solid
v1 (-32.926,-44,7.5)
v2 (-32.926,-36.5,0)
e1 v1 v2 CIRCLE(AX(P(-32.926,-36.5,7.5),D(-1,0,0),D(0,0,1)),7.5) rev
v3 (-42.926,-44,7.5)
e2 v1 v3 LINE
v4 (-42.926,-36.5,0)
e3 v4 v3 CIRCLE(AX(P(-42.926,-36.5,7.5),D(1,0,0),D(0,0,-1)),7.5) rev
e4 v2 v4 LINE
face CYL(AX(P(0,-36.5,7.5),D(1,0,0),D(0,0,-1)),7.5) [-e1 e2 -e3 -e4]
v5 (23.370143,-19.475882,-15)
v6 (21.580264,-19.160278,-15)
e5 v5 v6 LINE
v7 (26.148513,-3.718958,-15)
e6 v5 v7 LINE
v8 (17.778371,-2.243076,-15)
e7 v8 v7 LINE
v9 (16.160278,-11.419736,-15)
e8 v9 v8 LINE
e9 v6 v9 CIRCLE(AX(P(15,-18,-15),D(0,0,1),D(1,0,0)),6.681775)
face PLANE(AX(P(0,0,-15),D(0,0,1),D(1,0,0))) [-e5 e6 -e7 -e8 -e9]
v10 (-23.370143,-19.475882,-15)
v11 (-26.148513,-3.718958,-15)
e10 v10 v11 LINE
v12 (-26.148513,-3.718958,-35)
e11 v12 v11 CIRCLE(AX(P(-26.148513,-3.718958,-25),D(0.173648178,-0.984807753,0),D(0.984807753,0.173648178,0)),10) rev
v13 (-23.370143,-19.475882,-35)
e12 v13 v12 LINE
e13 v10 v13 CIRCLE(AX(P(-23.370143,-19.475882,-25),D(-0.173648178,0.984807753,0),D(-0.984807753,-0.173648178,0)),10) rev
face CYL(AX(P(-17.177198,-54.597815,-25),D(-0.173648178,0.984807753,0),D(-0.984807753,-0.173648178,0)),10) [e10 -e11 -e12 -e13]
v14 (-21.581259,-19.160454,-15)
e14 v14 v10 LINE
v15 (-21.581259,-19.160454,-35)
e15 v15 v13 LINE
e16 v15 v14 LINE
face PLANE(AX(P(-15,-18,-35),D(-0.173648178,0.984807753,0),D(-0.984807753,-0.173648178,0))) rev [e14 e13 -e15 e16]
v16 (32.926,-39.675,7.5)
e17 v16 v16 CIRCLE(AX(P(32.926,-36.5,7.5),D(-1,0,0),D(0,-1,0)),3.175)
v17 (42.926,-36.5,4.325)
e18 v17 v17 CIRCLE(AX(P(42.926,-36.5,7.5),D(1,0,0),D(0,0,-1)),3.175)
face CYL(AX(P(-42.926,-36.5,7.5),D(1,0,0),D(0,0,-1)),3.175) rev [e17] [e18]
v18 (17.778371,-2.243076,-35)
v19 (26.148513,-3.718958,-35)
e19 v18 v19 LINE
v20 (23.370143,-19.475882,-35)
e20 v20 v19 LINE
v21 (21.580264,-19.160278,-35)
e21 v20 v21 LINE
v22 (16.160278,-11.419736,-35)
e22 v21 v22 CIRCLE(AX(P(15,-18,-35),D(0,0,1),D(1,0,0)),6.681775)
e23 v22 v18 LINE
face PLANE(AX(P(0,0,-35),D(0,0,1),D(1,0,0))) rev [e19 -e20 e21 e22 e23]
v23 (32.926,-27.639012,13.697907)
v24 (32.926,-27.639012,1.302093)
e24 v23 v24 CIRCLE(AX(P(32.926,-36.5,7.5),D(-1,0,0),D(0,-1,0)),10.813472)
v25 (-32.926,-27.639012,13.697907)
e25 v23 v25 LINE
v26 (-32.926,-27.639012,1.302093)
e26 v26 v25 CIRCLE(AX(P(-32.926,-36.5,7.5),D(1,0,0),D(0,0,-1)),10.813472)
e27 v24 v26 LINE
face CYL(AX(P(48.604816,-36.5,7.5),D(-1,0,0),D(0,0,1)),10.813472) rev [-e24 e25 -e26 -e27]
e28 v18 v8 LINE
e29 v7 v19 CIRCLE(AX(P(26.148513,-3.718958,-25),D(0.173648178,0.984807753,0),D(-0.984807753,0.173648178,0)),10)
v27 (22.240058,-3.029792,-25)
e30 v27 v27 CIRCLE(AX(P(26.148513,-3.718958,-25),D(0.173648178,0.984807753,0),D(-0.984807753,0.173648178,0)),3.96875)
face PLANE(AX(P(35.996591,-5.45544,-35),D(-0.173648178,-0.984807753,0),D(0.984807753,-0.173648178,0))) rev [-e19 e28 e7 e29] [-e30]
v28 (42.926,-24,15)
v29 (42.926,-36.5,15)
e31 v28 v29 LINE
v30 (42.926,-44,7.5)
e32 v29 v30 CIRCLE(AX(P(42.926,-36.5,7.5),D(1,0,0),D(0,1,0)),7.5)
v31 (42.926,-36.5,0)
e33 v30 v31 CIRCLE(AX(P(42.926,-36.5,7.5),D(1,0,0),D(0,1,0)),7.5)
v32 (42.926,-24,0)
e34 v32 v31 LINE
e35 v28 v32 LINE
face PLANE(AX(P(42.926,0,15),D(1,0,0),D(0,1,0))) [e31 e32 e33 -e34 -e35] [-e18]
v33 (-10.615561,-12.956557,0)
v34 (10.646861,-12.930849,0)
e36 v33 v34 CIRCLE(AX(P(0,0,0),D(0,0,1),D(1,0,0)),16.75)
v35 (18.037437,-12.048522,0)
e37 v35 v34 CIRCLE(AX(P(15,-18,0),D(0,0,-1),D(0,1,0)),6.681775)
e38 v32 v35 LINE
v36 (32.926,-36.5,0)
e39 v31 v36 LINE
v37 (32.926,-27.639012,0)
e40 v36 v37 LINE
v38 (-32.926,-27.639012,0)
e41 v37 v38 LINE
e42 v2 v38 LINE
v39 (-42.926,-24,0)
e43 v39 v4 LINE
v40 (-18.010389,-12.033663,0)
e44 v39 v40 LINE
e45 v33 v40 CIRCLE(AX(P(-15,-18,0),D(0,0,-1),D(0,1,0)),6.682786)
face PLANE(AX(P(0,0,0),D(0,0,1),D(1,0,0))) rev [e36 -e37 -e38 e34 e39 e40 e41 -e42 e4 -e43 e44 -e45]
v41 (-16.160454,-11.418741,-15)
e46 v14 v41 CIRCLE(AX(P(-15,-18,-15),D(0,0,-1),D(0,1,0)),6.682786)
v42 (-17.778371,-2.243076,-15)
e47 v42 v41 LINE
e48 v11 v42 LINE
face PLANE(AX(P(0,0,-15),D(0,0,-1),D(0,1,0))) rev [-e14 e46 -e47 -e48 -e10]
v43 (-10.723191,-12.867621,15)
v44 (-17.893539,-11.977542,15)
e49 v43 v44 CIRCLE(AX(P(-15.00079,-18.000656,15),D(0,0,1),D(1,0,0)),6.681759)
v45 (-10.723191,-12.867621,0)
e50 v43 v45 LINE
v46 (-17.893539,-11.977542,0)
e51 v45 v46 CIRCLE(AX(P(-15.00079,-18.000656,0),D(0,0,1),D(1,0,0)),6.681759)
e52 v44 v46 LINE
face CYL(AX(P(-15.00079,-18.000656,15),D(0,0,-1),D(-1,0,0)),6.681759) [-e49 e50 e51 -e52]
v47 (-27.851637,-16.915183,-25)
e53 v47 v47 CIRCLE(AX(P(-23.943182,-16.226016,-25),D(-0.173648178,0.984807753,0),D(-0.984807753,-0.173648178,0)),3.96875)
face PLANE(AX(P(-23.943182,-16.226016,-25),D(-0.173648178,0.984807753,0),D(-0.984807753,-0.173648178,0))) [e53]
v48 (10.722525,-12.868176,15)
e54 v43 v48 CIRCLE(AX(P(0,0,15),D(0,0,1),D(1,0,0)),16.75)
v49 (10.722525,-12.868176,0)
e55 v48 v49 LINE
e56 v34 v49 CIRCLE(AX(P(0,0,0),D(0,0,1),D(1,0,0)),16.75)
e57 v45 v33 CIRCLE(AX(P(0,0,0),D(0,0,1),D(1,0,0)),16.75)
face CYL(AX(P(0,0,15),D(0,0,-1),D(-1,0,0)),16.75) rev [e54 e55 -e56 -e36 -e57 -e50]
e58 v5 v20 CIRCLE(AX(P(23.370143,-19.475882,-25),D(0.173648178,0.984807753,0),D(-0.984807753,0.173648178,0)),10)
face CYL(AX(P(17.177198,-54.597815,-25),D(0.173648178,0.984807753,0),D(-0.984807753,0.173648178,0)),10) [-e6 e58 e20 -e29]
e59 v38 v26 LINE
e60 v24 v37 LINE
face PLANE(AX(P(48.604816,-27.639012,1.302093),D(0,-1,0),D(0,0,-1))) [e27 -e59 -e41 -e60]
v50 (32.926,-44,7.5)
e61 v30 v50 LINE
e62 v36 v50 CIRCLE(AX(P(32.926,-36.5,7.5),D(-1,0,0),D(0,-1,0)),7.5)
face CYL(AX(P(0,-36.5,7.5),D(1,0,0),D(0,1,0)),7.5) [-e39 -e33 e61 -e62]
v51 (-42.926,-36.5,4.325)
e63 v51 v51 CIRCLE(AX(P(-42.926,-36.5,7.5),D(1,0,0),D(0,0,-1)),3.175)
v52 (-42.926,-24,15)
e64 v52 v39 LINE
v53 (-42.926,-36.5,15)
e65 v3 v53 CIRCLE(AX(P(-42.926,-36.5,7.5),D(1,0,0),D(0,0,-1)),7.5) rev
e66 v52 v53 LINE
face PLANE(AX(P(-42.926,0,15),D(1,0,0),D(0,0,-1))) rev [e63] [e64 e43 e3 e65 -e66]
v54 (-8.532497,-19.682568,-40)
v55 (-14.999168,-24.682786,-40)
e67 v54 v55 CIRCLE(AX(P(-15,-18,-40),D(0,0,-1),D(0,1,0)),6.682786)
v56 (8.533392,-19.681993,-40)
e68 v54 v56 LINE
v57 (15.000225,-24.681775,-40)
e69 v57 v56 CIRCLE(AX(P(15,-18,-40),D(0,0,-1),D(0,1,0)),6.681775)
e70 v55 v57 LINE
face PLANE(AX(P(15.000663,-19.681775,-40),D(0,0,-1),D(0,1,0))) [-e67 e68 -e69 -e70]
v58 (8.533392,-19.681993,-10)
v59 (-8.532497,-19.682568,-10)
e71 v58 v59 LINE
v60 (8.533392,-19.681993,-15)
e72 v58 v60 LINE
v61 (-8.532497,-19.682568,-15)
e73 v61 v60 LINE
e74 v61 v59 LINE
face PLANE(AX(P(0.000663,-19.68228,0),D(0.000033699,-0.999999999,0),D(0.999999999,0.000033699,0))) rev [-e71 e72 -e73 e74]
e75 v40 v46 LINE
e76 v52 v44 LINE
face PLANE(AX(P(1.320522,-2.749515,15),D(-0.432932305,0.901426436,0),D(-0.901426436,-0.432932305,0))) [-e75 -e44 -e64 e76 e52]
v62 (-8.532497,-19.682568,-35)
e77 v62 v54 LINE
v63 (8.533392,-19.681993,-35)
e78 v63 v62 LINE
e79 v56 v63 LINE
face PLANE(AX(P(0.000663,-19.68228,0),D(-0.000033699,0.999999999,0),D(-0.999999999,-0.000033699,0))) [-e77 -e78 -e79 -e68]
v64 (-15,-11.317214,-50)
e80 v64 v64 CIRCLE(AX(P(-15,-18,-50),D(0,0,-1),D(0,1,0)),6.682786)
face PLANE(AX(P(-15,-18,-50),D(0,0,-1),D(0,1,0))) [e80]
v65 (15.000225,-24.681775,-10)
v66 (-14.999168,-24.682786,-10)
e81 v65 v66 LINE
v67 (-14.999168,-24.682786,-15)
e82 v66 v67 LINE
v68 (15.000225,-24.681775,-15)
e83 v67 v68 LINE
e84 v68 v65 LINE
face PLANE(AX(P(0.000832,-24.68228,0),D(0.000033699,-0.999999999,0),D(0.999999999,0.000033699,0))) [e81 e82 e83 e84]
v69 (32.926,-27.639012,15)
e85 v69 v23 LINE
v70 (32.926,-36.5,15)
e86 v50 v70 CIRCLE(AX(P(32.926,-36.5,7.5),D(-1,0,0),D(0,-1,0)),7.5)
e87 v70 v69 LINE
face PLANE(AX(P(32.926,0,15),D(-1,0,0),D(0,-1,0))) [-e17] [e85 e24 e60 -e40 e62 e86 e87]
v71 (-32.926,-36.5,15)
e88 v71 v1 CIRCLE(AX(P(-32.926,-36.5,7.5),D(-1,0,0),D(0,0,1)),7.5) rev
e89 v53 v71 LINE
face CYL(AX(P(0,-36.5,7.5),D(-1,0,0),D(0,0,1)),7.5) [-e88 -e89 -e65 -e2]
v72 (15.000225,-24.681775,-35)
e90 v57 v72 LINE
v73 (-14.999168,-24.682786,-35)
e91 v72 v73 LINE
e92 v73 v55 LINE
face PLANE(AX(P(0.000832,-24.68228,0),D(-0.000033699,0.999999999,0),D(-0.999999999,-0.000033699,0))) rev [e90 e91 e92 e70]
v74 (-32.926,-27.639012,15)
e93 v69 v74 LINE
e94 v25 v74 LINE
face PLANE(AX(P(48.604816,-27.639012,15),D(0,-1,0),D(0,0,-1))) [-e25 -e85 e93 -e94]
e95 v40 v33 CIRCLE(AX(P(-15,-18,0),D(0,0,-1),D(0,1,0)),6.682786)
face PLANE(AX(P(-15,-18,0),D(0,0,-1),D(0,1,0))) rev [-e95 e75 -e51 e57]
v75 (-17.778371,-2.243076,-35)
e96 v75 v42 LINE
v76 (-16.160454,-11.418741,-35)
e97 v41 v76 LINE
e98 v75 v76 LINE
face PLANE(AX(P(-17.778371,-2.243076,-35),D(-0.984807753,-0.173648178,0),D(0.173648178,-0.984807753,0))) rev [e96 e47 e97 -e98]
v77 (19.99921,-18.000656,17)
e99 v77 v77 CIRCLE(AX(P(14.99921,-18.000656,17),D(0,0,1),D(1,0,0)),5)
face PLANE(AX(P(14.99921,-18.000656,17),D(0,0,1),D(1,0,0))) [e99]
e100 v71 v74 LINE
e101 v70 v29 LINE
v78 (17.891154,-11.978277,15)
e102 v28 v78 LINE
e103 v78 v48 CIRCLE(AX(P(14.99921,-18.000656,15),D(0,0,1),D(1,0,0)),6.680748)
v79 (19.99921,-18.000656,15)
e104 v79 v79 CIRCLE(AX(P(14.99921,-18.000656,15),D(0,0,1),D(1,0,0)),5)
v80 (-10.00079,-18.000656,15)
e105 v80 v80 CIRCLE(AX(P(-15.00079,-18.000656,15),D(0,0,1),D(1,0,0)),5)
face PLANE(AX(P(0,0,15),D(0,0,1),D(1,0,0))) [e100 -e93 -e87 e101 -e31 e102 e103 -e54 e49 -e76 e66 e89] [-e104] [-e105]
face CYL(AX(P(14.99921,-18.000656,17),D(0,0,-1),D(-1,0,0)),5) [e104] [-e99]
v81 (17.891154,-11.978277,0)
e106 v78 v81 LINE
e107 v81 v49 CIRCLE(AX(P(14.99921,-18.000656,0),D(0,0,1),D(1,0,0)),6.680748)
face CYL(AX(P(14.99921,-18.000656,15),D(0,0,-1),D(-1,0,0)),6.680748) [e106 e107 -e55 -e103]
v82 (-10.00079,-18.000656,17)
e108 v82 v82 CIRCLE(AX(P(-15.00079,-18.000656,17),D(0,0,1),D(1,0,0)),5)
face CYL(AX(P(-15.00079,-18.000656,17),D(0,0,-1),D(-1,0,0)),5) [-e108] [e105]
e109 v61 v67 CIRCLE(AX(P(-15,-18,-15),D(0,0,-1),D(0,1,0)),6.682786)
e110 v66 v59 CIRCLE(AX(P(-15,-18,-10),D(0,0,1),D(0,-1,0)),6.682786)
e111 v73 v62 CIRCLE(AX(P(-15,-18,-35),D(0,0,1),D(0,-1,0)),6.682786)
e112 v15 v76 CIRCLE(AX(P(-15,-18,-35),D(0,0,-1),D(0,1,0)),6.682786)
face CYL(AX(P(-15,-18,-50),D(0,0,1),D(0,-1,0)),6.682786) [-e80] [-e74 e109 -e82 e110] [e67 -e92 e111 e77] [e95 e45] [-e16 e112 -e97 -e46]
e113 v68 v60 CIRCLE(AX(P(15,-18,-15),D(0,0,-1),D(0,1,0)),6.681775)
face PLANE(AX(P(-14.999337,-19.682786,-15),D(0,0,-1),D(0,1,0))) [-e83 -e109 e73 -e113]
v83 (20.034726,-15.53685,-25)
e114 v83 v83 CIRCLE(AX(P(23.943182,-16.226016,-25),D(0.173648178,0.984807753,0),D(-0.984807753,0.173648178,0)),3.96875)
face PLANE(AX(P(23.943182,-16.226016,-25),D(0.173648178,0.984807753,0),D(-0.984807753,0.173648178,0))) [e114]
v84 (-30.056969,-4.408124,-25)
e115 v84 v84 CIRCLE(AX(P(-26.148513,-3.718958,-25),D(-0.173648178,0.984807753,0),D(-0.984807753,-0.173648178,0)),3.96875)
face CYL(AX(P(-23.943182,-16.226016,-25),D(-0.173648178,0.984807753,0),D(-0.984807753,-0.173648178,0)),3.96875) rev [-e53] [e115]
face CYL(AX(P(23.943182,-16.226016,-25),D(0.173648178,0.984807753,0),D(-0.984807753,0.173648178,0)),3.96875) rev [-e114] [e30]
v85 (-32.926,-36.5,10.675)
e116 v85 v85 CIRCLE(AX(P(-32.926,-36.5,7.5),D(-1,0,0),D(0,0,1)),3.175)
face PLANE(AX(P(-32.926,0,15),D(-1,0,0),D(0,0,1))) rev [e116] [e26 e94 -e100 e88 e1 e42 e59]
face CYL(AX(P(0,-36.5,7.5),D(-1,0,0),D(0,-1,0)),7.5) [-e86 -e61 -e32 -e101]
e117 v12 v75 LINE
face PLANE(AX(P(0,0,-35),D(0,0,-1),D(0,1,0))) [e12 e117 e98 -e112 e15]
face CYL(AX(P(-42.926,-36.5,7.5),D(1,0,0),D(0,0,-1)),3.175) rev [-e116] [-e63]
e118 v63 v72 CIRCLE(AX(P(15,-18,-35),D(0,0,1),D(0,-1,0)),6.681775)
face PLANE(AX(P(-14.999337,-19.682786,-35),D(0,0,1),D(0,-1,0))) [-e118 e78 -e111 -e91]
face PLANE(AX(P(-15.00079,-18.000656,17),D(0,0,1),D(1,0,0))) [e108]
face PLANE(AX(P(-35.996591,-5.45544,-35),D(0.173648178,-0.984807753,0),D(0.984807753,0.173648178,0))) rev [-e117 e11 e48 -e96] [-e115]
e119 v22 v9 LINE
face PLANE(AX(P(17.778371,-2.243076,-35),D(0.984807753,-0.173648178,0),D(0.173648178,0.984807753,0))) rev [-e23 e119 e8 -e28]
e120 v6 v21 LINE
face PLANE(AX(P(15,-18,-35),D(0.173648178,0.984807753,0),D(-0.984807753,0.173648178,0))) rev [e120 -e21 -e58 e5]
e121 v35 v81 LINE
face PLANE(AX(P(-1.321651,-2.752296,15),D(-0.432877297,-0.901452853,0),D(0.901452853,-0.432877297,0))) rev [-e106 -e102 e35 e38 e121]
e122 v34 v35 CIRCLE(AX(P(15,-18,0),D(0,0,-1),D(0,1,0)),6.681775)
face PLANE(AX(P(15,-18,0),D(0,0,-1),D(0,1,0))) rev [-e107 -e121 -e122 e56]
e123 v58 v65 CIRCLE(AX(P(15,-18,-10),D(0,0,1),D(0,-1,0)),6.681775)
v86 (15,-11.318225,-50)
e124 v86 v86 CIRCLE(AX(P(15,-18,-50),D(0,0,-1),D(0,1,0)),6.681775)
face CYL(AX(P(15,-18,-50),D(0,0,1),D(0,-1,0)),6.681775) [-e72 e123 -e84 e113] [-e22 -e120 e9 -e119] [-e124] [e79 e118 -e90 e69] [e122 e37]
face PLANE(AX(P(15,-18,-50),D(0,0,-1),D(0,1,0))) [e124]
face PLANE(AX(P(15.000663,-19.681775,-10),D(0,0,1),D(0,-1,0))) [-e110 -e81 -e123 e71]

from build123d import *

# Parameters (mm, degrees)
BOSS_EXTRUDE1_DEPTH  = 15
SKETCH2_R            = 5
BOSS_EXTRUDE2_DEPTH  = 2
FILLET1_R            = 7.5
SKETCH3_R            = 3.175
CUT_EXTRUDE1_DEPTH   = 98.956959446
SKETCH6_R            = 6.681774697
SKETCH6_R_2          = 6.68278568
BOSS_EXTRUDE12_DEPTH = 50
SKETCH7_W            = 30
SKETCH7_H            = 5
BOSS_EXTRUDE13_DEPTH = 5
BOSS_EXTRUDE14_DEPTH = 20
CUT_EXTRUDE2_DEPTH   = 80.803575914
CUT_EXTRUDE3_DEPTH   = 80.803575914
SKETCH14_R           = 3.96875
CUT_EXTRUDE5_DEPTH   = 12.7
SKETCH15_R           = 3.96875
CUT_EXTRUDE6_DEPTH   = 12.7
CUT_EXTRUDE7_DEPTH   = 65.852


with BuildPart() as part:
    # Sketch1 → Boss-Extrude1 (new body)
    with BuildSketch(Plane.XY):
        with BuildLine():
            Line((-42.926, -44), (-32.926, -44))
            Line((-32.926, -44), (-32.926, -28.710188268))
            Line((-32.926, -28.710188268), (32.926, -28.710188268))
            Line((32.926, -28.710188268), (32.926, -44))
            Line((32.926, -44), (42.926, -44))
            Line((42.926, -44), (42.926, -24))
            Line((42.926, -24), (17.891154449, -11.978277245))
            ThreePointArc((17.891154449, -11.978277245), (14.176193126, -11.370797146), (10.722524758, -12.86817636))
            ThreePointArc((10.722524758, -12.86817636), (-0.000433641, -16.749999994), (-10.723191032, -12.867621151))
            ThreePointArc((-10.723191032, -12.867621151), (-14.17767847, -11.369790059), (-17.893538872, -11.977542403))
            Line((-17.893538872, -11.977542403), (-42.926, -24))
            Line((-42.926, -24), (-42.926, -44))
        make_face()
    extrude(amount=BOSS_EXTRUDE1_DEPTH)

    # Sketch2 → Boss-Extrude2 (add)
    with BuildSketch(Plane.XY.offset(15)):
        with Locations((-15.00078962, -18.000656449)):
            Circle(SKETCH2_R)
        with Locations((14.99921038, -18.000656449)):
            Circle(SKETCH2_R)
    extrude(amount=BOSS_EXTRUDE2_DEPTH)

    # Fillet1
    fillet1_edges = [part.edges().sort_by_distance(p)[0] for p in [
        (37.926, -44, 0),
        (37.926, -44, 15),
        (-37.926, -44, 0),
        (-37.926, -44, 15),
    ]]
    fillet(fillet1_edges, radius=FILLET1_R - 0.0001)  # a hair under: the kernel refuses the full size

    # Sketch3 → Cut-Extrude1 (cut, through all)
    with BuildSketch(Plane(origin=(42.926, 0, 0), x_dir=(0, 0, -1), z_dir=(1, 0, 0))):
        with Locations((-7.5, -36.5)):
            Circle(SKETCH3_R)
    extrude(amount=-CUT_EXTRUDE1_DEPTH, mode=Mode.SUBTRACT)

    # Sketch6 → Boss-Extrude12 (add)
    with BuildSketch(Plane(origin=(0, 0, 0), x_dir=(1, 0, 0), z_dir=(0, 0, -1))):
        with Locations(Location((15, 18, 0), (0, 0, 229.345625522))):
            Circle(SKETCH6_R)
        with Locations(Location((-15, 18, 0), (0, 0, 311.001557714))):
            Circle(SKETCH6_R_2)
    extrude(amount=BOSS_EXTRUDE12_DEPTH)

    # Sketch7 → Boss-Extrude13 (add)
    with BuildSketch(Plane(origin=(0.000831779, -24.682280164, 0), x_dir=(-0.9999999994321744, -3.369942598152246e-05, 0), z_dir=(3.369942598152246e-05, -0.9999999994321744, 0))):
        with Locations((0, 37.5)):
            Rectangle(SKETCH7_W, SKETCH7_H)
        with Locations((0, 12.5)):
            Rectangle(SKETCH7_W, SKETCH7_H)
    extrude(amount=-BOSS_EXTRUDE13_DEPTH)

    # Sketch8 → Boss-Extrude14 (add)
    with BuildSketch(Plane(origin=(0, 0, -15), x_dir=(-1, 0, 0), z_dir=(0, 0, -1))):
        Polygon((-15, -18), (-33.218220182, -21.212363759), (-35.996591025, -5.45543971), (-17.778370843, -2.243075952), align=None)
        Polygon((15, -18), (33.218220182, -21.212363759), (35.996591025, -5.45543971), (17.778370843, -2.243075952), align=None)
    extrude(amount=BOSS_EXTRUDE14_DEPTH)

    # Sketch9 → Cut-Extrude2 (cut, through all)
    with BuildSketch(Plane(origin=(0.152494897, 0.864841536, 0), x_dir=(0.9848077530122067, -0.17364817766693838, 0), z_dir=(0.17364817766693838, 0.9848077530122067, 0))):
        with BuildLine():
            Line((36.397049088, 35), (26.397049088, 35))
            ThreePointArc((26.397049088, 35), (33.46811688, 32.071067832), (36.397049088, 25.000000057))
            Line((36.397049088, 25.000000057), (36.397049088, 35))
        make_face()
        with BuildLine():
            Line((36.397049088, 15), (36.397049088, 25.000000057))
            ThreePointArc((36.397049088, 25.000000057), (33.46811692, 17.928932208), (26.397049088, 15))
            Line((26.397049088, 15), (36.397049088, 15))
        make_face()
    extrude(amount=-CUT_EXTRUDE2_DEPTH, mode=Mode.SUBTRACT)

    # Sketch10 → Cut-Extrude3 (cut, through all)
    with BuildSketch(Plane(origin=(-0.152494897, 0.864841536, 0), x_dir=(0.9848077530122081, 0.1736481776669306, 0), z_dir=(-0.1736481776669306, 0.9848077530122081, 0))):
        with BuildLine():
            Line((-26.397049088, 35), (-38.349952552, 35))
            Line((-38.349952552, 35), (-38.349952552, 15))
            Line((-38.349952552, 15), (-26.397049088, 15))
            ThreePointArc((-26.397049088, 15), (-36.397049088, 25), (-26.397049088, 35))
        make_face()
    extrude(amount=-CUT_EXTRUDE3_DEPTH, mode=Mode.SUBTRACT)

    # Sketch14 → Cut-Extrude5 (cut)
    with BuildSketch(Plane(origin=(0.152494897, 0.864841536, 0), x_dir=(0.9848077530122067, -0.17364817766693838, 0), z_dir=(0.17364817766693838, 0.9848077530122067, 0))):
        with Locations(Location((26.397049088, 25, 0), (0, 0, 180))):
            Circle(SKETCH14_R)
    extrude(amount=-CUT_EXTRUDE5_DEPTH, mode=Mode.SUBTRACT)

    # Sketch15 → Cut-Extrude6 (cut)
    with BuildSketch(Plane(origin=(-0.152494897, 0.864841536, 0), x_dir=(0.9848077530122081, 0.1736481776669306, 0), z_dir=(-0.1736481776669306, 0.9848077530122081, 0))):
        with Locations(Location((-26.397049088, 25, 0), (0, 0, 180))):
            Circle(SKETCH15_R)
    extrude(amount=-CUT_EXTRUDE6_DEPTH, mode=Mode.SUBTRACT)

    # Sketch16 → Cut-Extrude7 (cut)
    with BuildSketch(Plane(origin=(-32.926, 0, 0), x_dir=(0, 0, -1), z_dir=(1, 0, 0))):
        with BuildLine():
            Line((-1.30209294, -27.639011629), (0, -27.639011629))
            Line((0, -27.639011629), (0, -30.25))
            Line((0, -30.25), (-15, -30.25))
            Line((-15, -30.25), (-15, -27.639011629))
            Line((-15, -27.639011629), (-13.69790706, -27.639011629))
            ThreePointArc((-13.69790706, -27.639011629), (-7.5, -25.686528456), (-1.30209294, -27.639011629))
        make_face()
    extrude(amount=CUT_EXTRUDE7_DEPTH, mode=Mode.SUBTRACT)


solid = part.part
